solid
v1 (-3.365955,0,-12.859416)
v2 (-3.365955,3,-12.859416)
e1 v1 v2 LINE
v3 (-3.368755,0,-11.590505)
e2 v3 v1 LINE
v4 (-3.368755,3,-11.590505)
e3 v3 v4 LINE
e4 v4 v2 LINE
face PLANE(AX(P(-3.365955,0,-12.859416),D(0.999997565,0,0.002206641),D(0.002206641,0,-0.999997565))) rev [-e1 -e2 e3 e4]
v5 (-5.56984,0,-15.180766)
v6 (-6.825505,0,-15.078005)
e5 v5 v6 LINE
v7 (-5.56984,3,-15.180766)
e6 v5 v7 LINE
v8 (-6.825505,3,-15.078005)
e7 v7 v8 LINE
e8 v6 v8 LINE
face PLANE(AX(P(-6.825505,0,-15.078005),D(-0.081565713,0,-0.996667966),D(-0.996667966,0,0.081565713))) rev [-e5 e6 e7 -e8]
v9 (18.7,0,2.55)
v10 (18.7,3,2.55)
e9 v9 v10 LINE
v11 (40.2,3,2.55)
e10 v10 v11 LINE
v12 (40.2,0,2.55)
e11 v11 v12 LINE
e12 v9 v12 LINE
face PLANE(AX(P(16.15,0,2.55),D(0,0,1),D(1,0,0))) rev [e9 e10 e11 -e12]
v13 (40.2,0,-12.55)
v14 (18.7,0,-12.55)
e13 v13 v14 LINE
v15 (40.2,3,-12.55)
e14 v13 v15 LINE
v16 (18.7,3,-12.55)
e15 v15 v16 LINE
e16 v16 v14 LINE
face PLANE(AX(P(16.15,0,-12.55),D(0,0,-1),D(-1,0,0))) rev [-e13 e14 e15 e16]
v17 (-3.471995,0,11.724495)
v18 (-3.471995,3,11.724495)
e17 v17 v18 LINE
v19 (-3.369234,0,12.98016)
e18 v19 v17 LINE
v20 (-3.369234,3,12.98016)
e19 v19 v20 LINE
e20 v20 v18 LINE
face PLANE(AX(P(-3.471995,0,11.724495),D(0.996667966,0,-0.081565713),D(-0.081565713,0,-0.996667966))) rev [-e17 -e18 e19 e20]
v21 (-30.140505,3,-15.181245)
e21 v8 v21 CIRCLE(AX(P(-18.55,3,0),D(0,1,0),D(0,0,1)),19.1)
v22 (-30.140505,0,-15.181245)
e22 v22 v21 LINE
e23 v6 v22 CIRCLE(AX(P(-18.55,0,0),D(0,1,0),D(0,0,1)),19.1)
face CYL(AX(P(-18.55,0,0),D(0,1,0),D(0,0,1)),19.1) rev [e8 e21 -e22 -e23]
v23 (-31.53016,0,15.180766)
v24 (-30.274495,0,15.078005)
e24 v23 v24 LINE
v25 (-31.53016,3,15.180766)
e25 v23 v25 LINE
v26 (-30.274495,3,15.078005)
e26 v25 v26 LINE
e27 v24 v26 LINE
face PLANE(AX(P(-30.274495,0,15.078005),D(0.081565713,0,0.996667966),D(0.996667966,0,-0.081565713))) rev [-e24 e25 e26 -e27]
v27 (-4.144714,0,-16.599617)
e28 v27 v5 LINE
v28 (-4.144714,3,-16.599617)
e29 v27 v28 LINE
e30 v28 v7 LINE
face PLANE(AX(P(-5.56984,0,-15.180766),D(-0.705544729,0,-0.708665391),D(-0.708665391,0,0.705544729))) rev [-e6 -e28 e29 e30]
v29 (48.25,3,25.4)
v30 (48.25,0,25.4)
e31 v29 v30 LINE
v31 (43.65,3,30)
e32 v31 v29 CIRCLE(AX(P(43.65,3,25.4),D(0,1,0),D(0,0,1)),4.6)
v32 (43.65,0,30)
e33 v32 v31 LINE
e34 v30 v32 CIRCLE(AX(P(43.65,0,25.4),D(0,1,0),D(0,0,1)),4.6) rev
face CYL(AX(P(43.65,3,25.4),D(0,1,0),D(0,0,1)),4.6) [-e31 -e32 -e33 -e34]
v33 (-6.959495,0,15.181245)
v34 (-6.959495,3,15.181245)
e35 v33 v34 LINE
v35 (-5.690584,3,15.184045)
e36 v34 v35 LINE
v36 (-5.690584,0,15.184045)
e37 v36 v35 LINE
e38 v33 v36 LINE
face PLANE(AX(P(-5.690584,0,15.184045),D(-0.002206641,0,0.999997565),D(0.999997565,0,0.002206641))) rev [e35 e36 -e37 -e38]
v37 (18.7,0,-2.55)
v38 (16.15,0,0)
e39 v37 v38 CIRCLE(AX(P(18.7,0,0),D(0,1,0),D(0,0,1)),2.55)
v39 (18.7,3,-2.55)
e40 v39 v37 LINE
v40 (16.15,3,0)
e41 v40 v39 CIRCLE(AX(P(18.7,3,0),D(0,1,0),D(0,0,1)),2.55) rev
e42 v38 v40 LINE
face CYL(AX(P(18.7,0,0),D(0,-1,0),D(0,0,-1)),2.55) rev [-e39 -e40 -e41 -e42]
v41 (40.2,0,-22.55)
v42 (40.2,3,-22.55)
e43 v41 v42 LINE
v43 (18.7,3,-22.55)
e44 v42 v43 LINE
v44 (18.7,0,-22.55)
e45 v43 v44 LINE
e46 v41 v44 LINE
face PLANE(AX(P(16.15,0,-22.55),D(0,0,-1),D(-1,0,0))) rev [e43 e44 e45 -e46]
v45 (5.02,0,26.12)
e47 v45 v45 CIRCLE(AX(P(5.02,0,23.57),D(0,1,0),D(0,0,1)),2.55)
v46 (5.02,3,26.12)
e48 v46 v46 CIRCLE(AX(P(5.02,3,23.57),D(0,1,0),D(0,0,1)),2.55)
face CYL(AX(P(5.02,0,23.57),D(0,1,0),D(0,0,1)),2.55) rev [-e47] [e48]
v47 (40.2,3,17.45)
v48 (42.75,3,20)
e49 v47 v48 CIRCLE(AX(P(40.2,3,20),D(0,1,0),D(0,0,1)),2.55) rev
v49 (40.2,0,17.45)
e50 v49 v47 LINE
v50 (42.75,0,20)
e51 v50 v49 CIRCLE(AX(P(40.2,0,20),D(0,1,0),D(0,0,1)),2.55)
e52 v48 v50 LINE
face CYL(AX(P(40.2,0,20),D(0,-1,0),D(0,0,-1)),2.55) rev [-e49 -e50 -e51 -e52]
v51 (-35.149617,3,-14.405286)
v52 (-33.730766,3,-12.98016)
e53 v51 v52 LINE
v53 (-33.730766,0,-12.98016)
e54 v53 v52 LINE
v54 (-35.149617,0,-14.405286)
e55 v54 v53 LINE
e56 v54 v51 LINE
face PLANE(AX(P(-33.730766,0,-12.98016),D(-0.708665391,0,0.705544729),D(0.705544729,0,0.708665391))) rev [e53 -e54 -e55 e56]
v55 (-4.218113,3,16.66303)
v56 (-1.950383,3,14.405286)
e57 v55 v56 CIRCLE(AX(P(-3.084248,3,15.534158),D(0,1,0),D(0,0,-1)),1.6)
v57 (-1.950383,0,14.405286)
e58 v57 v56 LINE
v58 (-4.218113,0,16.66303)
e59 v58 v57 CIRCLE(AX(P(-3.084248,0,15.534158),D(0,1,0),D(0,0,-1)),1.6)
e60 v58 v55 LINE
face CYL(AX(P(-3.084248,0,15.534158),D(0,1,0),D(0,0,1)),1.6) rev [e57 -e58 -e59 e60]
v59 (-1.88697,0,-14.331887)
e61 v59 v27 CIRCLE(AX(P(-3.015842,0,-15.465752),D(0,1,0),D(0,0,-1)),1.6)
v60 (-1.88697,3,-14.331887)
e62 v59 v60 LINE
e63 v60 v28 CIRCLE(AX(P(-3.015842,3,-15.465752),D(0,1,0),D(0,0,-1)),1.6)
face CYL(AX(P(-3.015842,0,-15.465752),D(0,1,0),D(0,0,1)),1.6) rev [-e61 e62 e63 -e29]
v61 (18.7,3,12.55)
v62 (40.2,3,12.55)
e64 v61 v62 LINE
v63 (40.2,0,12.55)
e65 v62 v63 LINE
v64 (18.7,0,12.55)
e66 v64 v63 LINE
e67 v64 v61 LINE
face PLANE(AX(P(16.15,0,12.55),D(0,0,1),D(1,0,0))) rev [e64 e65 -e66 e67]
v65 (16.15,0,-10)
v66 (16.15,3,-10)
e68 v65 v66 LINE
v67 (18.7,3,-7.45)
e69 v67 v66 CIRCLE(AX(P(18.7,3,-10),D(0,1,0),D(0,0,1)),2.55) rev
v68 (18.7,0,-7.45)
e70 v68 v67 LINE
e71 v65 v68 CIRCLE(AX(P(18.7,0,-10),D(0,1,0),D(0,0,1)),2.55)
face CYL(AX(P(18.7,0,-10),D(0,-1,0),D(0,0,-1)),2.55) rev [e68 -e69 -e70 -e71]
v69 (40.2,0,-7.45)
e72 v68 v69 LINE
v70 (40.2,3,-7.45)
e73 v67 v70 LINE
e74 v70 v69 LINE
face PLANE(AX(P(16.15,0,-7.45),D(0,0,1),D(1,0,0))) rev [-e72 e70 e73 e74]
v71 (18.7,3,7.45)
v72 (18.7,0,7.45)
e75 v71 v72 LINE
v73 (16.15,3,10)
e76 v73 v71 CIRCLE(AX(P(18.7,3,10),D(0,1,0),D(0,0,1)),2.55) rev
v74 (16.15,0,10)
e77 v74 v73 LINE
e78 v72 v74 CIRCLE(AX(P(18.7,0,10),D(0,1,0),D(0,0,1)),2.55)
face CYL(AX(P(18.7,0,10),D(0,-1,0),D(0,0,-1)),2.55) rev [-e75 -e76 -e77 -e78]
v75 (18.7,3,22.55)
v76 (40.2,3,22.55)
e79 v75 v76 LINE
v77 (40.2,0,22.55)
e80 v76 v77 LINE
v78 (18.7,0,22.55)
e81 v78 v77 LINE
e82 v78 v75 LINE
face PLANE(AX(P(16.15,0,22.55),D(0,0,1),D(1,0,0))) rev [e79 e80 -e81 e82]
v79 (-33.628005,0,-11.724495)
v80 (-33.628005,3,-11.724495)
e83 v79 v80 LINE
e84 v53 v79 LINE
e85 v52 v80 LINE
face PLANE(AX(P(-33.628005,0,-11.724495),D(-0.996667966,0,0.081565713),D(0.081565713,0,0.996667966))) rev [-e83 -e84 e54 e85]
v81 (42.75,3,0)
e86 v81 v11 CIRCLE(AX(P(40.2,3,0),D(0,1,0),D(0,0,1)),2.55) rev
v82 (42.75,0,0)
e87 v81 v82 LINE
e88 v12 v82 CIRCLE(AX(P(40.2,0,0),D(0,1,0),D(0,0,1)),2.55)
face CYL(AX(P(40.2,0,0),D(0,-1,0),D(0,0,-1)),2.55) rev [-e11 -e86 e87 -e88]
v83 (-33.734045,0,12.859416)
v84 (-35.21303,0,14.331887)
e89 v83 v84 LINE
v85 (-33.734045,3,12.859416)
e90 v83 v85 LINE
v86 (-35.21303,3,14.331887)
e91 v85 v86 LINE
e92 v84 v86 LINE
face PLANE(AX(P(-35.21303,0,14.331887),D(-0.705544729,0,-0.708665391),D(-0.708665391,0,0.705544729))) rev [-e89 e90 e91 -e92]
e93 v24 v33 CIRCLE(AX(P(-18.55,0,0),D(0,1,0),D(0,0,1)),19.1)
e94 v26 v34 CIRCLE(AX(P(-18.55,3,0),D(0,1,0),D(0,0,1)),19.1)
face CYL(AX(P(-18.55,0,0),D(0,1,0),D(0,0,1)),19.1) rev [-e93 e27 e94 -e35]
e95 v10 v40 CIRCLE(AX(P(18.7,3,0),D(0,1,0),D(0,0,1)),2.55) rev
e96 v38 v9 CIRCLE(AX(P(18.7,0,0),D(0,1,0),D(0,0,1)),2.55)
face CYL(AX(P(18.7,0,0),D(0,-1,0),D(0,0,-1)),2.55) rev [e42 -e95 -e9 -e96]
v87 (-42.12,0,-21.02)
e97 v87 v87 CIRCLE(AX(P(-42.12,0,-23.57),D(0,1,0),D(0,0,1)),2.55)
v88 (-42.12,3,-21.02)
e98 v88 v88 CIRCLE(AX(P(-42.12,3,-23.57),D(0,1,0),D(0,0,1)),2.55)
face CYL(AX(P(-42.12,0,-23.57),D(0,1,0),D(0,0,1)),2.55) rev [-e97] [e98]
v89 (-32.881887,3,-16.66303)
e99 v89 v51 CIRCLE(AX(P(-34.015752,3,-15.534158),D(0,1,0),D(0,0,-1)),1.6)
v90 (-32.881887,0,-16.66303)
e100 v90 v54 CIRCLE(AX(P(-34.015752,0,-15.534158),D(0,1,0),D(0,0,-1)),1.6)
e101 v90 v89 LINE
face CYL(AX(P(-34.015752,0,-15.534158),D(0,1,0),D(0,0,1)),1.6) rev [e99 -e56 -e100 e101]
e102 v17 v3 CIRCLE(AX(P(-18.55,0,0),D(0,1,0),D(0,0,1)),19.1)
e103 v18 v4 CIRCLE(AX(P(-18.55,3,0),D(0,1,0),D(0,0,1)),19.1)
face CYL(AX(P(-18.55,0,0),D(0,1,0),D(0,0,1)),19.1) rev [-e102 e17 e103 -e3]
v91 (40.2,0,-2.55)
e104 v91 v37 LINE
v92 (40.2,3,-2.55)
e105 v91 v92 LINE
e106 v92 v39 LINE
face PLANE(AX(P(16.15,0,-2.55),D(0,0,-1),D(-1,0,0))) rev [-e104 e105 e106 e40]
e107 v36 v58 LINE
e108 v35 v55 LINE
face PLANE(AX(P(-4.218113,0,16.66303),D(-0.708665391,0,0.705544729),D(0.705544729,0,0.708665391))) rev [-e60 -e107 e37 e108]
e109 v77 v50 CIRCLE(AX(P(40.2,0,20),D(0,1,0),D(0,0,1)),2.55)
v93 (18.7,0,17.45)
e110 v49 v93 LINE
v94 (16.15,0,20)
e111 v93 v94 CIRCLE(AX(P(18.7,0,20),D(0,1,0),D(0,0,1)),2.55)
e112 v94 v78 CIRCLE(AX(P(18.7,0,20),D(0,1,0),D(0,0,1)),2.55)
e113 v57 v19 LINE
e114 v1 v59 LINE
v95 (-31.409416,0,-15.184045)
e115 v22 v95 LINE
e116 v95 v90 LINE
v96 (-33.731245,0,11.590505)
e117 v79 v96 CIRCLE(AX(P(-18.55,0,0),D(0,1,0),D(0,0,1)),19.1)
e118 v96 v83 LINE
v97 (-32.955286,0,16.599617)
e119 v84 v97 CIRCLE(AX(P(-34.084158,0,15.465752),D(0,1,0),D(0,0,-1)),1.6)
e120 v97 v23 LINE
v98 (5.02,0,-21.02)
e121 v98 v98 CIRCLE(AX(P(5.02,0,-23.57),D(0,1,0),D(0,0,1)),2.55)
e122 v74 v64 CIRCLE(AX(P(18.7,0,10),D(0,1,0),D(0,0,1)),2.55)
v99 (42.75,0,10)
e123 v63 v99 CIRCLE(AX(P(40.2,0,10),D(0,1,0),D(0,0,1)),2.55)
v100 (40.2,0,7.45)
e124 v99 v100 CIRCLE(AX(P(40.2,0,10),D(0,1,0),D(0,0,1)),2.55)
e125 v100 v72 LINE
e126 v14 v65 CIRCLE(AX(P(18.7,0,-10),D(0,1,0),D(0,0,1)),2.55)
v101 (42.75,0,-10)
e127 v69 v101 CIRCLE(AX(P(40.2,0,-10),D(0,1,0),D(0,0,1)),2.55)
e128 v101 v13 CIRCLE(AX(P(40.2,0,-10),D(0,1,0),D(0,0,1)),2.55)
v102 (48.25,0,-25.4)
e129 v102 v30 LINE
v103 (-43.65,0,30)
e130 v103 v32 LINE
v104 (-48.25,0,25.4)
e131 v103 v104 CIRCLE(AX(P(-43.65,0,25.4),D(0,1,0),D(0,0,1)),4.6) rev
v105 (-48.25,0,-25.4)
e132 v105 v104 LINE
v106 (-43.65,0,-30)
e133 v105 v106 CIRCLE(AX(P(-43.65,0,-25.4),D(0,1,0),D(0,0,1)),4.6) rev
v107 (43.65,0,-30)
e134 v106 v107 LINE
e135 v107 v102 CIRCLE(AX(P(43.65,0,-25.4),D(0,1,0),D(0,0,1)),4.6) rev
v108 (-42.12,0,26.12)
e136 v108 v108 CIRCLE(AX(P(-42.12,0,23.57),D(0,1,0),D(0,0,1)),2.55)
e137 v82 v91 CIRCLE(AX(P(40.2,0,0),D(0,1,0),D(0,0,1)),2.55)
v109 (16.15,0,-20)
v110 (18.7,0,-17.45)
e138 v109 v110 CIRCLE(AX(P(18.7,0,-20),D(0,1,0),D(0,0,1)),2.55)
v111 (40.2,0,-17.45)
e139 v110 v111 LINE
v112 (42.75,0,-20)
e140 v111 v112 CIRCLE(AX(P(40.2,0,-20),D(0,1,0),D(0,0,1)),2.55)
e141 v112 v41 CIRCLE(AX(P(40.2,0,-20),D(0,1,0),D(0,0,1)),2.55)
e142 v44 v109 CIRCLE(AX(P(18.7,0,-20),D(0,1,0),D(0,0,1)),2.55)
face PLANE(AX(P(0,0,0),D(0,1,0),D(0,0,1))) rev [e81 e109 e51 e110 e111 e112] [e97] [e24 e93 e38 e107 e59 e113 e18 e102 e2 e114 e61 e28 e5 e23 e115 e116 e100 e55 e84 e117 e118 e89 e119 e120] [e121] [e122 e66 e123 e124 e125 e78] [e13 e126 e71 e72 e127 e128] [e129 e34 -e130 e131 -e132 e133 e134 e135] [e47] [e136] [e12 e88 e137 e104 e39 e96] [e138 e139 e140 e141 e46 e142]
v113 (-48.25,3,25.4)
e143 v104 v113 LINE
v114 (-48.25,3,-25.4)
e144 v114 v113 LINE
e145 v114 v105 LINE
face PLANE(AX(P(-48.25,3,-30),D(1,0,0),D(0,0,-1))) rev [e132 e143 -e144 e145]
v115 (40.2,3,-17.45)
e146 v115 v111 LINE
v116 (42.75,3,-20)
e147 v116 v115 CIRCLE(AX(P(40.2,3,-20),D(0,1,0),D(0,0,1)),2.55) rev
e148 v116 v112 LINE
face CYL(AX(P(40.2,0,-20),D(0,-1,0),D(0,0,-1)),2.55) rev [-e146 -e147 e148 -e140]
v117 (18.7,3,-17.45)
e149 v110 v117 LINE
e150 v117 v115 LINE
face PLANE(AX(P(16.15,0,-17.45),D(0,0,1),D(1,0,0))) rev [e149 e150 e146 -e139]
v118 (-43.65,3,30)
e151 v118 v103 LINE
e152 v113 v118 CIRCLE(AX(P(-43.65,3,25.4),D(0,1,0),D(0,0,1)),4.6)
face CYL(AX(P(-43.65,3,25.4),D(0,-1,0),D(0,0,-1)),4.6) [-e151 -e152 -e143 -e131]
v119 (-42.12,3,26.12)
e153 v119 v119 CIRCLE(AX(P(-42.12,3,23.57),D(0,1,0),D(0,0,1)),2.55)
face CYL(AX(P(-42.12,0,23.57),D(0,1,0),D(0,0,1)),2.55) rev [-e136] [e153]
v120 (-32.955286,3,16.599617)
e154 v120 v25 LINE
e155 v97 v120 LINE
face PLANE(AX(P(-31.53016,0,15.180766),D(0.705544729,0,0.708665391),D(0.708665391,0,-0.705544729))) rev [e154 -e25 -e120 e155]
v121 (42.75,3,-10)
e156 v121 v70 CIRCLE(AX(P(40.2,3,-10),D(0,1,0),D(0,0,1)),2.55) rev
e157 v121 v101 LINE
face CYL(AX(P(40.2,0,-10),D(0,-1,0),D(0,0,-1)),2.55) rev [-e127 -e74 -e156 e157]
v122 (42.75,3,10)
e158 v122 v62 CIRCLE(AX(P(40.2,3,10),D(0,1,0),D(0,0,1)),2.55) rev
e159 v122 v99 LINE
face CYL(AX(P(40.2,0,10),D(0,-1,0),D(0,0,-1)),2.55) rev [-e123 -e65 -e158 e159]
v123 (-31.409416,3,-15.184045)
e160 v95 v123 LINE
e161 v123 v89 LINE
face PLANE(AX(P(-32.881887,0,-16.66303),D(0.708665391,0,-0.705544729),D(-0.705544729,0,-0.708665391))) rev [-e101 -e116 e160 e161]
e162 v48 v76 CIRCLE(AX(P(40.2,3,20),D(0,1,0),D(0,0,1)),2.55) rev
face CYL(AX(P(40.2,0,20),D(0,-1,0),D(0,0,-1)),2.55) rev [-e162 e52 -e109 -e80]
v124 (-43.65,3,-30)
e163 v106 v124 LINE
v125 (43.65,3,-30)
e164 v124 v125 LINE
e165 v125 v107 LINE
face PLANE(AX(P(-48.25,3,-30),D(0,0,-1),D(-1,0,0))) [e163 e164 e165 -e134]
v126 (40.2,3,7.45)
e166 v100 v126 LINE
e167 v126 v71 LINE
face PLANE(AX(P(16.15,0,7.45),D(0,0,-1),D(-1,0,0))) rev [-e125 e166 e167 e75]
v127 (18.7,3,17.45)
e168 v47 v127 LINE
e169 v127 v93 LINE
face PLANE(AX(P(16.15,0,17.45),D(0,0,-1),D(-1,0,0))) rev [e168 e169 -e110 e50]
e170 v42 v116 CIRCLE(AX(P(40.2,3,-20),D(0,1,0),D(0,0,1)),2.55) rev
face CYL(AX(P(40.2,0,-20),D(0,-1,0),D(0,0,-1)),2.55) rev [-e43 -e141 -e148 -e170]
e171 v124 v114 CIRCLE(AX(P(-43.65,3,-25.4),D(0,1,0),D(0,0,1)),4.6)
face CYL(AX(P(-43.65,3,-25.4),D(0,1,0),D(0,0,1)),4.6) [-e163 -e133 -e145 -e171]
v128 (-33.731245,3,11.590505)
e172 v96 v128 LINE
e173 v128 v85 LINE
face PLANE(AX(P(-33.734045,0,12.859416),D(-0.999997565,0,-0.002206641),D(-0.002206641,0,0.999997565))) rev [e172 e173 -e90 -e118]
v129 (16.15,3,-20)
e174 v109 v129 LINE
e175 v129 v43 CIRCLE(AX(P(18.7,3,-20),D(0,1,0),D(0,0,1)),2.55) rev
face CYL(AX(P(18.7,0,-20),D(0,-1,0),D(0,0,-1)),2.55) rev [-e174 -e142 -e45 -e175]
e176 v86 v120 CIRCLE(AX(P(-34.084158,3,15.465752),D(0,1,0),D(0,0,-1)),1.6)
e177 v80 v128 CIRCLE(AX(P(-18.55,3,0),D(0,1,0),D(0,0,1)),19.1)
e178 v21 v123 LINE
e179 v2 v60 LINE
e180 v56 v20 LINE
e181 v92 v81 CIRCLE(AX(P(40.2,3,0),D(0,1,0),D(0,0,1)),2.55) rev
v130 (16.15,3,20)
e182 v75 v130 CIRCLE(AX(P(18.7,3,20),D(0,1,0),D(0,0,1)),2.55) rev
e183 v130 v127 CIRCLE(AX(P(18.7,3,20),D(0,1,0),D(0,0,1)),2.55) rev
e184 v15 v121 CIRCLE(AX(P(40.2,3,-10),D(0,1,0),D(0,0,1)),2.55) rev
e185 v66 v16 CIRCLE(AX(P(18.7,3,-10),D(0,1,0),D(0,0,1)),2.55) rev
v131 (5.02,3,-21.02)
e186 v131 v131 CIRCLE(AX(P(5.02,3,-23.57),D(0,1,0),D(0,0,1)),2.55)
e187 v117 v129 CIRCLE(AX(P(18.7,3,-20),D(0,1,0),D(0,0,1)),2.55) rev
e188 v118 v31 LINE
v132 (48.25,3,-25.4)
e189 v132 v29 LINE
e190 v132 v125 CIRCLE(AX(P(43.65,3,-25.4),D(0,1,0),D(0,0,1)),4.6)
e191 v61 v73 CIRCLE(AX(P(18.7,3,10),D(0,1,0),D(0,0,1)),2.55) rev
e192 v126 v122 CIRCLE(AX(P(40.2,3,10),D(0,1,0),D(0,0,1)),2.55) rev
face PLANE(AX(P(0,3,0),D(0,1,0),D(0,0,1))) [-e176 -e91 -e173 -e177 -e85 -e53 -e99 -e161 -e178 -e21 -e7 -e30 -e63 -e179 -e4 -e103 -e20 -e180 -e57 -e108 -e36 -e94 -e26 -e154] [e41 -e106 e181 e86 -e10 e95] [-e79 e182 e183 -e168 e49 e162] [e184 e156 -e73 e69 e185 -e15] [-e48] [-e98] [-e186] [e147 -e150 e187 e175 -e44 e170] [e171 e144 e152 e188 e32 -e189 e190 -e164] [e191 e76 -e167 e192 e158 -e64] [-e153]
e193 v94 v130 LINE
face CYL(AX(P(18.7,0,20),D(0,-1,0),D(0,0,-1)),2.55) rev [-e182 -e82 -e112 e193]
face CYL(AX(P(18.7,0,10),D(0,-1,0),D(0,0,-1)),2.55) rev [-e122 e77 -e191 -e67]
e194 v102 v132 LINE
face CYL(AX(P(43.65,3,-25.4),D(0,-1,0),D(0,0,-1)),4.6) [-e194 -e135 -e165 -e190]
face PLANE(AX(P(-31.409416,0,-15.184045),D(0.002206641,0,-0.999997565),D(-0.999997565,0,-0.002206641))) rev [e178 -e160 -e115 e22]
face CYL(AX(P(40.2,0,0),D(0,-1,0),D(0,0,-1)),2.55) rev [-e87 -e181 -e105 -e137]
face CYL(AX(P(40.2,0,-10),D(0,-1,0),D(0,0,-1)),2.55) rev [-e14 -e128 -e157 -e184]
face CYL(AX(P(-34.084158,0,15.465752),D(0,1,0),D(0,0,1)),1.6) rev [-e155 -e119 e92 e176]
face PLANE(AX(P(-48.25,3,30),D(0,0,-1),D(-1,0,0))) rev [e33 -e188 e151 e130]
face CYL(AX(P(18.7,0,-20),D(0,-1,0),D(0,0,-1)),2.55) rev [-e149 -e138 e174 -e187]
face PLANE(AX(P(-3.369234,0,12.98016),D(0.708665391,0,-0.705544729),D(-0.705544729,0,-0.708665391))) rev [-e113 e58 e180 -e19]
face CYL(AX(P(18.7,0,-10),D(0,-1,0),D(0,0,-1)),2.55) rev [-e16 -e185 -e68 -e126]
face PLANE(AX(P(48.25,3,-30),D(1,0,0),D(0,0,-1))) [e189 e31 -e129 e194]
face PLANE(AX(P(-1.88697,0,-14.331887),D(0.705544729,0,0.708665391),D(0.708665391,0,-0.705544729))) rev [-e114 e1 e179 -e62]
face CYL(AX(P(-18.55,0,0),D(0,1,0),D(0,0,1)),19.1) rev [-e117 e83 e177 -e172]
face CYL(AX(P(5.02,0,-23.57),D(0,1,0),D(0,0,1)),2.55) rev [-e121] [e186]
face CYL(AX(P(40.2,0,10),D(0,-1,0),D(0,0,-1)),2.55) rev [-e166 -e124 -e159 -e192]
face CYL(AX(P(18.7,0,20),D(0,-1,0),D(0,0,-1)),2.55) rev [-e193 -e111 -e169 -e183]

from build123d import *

# Parameters (mm, degrees)
SKETCH1_W           = 96.5
SKETCH1_H           = 60
BOSS_EXTRUDE1_DEPTH = 3
SKETCH2_R           = 2.55
SKETCH2_W           = 26.6
SKETCH2_H           = 5.1
CUT_EXTRUDE1_DEPTH  = 57.895188725
FILLET1_R           = 2.55
FILLET2_R           = 4.6


with BuildPart() as part:
    # Sketch1 → Boss-Extrude1 (new body)
    with BuildSketch(Plane(origin=(0, 0, 0), x_dir=(1, 0, 0), z_dir=(0, 1, 0))):
        Rectangle(SKETCH1_W, SKETCH1_H)
    extrude(amount=BOSS_EXTRUDE1_DEPTH)

    # Sketch2 → Cut-Extrude1 (cut, through all)
    with BuildSketch(Plane(origin=(0, 3, 0), x_dir=(1, 0, 0), z_dir=(0, 1, 0))):
        with Locations(Location((-42.12, 23.57, 0), (0, 0, 270))):
            Circle(SKETCH2_R)
        with Locations(Location((5.02, 23.57, 0), (0, 0, 270))):
            Circle(SKETCH2_R)
        with Locations(Location((5.02, -23.57, 0), (0, 0, 270))):
            Circle(SKETCH2_R)
        with Locations(Location((-42.12, -23.57, 0), (0, 0, 270))):
            Circle(SKETCH2_R)
        with Locations((29.45, 20)):
            Rectangle(SKETCH2_W, SKETCH2_H)
        with Locations((29.45, 10)):
            Rectangle(SKETCH2_W, SKETCH2_H)
        with Locations((29.45, 0)):
            Rectangle(SKETCH2_W, SKETCH2_H)
        with Locations((29.45, -10)):
            Rectangle(SKETCH2_W, SKETCH2_H)
        with Locations((29.45, -20)):
            Rectangle(SKETCH2_W, SKETCH2_H)
        with BuildLine():
            Line((-5.569839705, 15.180766292), (-4.144713605, 16.599616741))
            ThreePointArc((-4.144713605, 16.599616741), (-1.881977414, 16.594623682), (-1.886970473, 14.331887491))
            Line((-1.886970473, 14.331887491), (-3.365955143, 12.859415643))
            Line((-3.365955143, 12.859415643), (-3.36875518, 11.590504981))
            ThreePointArc((-3.36875518, 11.590504981), (0.549812749, -0.084575096), (-3.471995372, -11.72449472))
            Line((-3.471995372, -11.72449472), (-3.369233708, -12.980160295))
            Line((-3.369233708, -12.980160295), (-1.950383259, -14.405286395))
            ThreePointArc((-1.950383259, -14.405286395), (-1.955376318, -16.668022586), (-4.218112509, -16.663029527))
            Line((-4.218112509, -16.663029527), (-5.690584357, -15.184044857))
            Line((-5.690584357, -15.184044857), (-6.959495019, -15.18124482))
            ThreePointArc((-6.959495019, -15.18124482), (-18.634575096, -19.099812749), (-30.27449472, -15.078004628))
            Line((-30.27449472, -15.078004628), (-31.530160295, -15.180766292))
            Line((-31.530160295, -15.180766292), (-32.955286395, -16.599616741))
            ThreePointArc((-32.955286395, -16.599616741), (-35.218022586, -16.594623682), (-35.213029527, -14.331887491))
            Line((-35.213029527, -14.331887491), (-33.734044857, -12.859415643))
            Line((-33.734044857, -12.859415643), (-33.73124482, -11.590504981))
            ThreePointArc((-33.73124482, -11.590504981), (-37.649812749, 0.084575096), (-33.628004628, 11.72449472))
            Line((-33.628004628, 11.72449472), (-33.730766292, 12.980160295))
            Line((-33.730766292, 12.980160295), (-35.149616741, 14.405286395))
            ThreePointArc((-35.149616741, 14.405286395), (-35.144623682, 16.668022586), (-32.881887491, 16.663029527))
            Line((-32.881887491, 16.663029527), (-31.409415643, 15.184044857))
            Line((-31.409415643, 15.184044857), (-30.140504981, 15.18124482))
            ThreePointArc((-30.140504981, 15.18124482), (-18.465424904, 19.099812749), (-6.82550528, 15.078004628))
            Line((-6.82550528, 15.078004628), (-5.569839705, 15.180766292))
        make_face()
    extrude(amount=-CUT_EXTRUDE1_DEPTH, mode=Mode.SUBTRACT)

    # Fillet1
    fillet1_edges = [part.edges().sort_by_distance(p)[0] for p in [
        (42.75, 1.5, 12.55),
        (42.75, 1.5, 22.55),
        (42.75, 1.5, 17.45),
        (42.75, 1.5, 7.45),
        (42.75, 1.5, 2.55),
        (42.75, 1.5, -2.55),
        (42.75, 1.5, -7.45),
        (42.75, 1.5, -12.55),
        (42.75, 1.5, -17.45),
        (42.75, 1.5, -22.55),
        (16.15, 1.5, -17.45),
        (16.15, 1.5, -22.55),
        (16.15, 1.5, 22.55),
        (16.15, 1.5, 17.45),
        (16.15, 1.5, 12.55),
        (16.15, 1.5, 7.45),
        (16.15, 1.5, 2.55),
        (16.15, 1.5, -2.55),
        (16.15, 1.5, -7.45),
        (16.15, 1.5, -12.55),
    ]]
    fillet(fillet1_edges, radius=FILLET1_R - 0.0001)  # a hair under: the kernel refuses the full size

    # Fillet2
    fillet2_edges = [part.edges().sort_by_distance(p)[0] for p in [
        (-48.25, 1.5, -30),
        (48.25, 1.5, -30),
        (48.25, 1.5, 30),
        (-48.25, 1.5, 30),
    ]]
    fillet(fillet2_edges, radius=FILLET2_R)


solid = part.part
